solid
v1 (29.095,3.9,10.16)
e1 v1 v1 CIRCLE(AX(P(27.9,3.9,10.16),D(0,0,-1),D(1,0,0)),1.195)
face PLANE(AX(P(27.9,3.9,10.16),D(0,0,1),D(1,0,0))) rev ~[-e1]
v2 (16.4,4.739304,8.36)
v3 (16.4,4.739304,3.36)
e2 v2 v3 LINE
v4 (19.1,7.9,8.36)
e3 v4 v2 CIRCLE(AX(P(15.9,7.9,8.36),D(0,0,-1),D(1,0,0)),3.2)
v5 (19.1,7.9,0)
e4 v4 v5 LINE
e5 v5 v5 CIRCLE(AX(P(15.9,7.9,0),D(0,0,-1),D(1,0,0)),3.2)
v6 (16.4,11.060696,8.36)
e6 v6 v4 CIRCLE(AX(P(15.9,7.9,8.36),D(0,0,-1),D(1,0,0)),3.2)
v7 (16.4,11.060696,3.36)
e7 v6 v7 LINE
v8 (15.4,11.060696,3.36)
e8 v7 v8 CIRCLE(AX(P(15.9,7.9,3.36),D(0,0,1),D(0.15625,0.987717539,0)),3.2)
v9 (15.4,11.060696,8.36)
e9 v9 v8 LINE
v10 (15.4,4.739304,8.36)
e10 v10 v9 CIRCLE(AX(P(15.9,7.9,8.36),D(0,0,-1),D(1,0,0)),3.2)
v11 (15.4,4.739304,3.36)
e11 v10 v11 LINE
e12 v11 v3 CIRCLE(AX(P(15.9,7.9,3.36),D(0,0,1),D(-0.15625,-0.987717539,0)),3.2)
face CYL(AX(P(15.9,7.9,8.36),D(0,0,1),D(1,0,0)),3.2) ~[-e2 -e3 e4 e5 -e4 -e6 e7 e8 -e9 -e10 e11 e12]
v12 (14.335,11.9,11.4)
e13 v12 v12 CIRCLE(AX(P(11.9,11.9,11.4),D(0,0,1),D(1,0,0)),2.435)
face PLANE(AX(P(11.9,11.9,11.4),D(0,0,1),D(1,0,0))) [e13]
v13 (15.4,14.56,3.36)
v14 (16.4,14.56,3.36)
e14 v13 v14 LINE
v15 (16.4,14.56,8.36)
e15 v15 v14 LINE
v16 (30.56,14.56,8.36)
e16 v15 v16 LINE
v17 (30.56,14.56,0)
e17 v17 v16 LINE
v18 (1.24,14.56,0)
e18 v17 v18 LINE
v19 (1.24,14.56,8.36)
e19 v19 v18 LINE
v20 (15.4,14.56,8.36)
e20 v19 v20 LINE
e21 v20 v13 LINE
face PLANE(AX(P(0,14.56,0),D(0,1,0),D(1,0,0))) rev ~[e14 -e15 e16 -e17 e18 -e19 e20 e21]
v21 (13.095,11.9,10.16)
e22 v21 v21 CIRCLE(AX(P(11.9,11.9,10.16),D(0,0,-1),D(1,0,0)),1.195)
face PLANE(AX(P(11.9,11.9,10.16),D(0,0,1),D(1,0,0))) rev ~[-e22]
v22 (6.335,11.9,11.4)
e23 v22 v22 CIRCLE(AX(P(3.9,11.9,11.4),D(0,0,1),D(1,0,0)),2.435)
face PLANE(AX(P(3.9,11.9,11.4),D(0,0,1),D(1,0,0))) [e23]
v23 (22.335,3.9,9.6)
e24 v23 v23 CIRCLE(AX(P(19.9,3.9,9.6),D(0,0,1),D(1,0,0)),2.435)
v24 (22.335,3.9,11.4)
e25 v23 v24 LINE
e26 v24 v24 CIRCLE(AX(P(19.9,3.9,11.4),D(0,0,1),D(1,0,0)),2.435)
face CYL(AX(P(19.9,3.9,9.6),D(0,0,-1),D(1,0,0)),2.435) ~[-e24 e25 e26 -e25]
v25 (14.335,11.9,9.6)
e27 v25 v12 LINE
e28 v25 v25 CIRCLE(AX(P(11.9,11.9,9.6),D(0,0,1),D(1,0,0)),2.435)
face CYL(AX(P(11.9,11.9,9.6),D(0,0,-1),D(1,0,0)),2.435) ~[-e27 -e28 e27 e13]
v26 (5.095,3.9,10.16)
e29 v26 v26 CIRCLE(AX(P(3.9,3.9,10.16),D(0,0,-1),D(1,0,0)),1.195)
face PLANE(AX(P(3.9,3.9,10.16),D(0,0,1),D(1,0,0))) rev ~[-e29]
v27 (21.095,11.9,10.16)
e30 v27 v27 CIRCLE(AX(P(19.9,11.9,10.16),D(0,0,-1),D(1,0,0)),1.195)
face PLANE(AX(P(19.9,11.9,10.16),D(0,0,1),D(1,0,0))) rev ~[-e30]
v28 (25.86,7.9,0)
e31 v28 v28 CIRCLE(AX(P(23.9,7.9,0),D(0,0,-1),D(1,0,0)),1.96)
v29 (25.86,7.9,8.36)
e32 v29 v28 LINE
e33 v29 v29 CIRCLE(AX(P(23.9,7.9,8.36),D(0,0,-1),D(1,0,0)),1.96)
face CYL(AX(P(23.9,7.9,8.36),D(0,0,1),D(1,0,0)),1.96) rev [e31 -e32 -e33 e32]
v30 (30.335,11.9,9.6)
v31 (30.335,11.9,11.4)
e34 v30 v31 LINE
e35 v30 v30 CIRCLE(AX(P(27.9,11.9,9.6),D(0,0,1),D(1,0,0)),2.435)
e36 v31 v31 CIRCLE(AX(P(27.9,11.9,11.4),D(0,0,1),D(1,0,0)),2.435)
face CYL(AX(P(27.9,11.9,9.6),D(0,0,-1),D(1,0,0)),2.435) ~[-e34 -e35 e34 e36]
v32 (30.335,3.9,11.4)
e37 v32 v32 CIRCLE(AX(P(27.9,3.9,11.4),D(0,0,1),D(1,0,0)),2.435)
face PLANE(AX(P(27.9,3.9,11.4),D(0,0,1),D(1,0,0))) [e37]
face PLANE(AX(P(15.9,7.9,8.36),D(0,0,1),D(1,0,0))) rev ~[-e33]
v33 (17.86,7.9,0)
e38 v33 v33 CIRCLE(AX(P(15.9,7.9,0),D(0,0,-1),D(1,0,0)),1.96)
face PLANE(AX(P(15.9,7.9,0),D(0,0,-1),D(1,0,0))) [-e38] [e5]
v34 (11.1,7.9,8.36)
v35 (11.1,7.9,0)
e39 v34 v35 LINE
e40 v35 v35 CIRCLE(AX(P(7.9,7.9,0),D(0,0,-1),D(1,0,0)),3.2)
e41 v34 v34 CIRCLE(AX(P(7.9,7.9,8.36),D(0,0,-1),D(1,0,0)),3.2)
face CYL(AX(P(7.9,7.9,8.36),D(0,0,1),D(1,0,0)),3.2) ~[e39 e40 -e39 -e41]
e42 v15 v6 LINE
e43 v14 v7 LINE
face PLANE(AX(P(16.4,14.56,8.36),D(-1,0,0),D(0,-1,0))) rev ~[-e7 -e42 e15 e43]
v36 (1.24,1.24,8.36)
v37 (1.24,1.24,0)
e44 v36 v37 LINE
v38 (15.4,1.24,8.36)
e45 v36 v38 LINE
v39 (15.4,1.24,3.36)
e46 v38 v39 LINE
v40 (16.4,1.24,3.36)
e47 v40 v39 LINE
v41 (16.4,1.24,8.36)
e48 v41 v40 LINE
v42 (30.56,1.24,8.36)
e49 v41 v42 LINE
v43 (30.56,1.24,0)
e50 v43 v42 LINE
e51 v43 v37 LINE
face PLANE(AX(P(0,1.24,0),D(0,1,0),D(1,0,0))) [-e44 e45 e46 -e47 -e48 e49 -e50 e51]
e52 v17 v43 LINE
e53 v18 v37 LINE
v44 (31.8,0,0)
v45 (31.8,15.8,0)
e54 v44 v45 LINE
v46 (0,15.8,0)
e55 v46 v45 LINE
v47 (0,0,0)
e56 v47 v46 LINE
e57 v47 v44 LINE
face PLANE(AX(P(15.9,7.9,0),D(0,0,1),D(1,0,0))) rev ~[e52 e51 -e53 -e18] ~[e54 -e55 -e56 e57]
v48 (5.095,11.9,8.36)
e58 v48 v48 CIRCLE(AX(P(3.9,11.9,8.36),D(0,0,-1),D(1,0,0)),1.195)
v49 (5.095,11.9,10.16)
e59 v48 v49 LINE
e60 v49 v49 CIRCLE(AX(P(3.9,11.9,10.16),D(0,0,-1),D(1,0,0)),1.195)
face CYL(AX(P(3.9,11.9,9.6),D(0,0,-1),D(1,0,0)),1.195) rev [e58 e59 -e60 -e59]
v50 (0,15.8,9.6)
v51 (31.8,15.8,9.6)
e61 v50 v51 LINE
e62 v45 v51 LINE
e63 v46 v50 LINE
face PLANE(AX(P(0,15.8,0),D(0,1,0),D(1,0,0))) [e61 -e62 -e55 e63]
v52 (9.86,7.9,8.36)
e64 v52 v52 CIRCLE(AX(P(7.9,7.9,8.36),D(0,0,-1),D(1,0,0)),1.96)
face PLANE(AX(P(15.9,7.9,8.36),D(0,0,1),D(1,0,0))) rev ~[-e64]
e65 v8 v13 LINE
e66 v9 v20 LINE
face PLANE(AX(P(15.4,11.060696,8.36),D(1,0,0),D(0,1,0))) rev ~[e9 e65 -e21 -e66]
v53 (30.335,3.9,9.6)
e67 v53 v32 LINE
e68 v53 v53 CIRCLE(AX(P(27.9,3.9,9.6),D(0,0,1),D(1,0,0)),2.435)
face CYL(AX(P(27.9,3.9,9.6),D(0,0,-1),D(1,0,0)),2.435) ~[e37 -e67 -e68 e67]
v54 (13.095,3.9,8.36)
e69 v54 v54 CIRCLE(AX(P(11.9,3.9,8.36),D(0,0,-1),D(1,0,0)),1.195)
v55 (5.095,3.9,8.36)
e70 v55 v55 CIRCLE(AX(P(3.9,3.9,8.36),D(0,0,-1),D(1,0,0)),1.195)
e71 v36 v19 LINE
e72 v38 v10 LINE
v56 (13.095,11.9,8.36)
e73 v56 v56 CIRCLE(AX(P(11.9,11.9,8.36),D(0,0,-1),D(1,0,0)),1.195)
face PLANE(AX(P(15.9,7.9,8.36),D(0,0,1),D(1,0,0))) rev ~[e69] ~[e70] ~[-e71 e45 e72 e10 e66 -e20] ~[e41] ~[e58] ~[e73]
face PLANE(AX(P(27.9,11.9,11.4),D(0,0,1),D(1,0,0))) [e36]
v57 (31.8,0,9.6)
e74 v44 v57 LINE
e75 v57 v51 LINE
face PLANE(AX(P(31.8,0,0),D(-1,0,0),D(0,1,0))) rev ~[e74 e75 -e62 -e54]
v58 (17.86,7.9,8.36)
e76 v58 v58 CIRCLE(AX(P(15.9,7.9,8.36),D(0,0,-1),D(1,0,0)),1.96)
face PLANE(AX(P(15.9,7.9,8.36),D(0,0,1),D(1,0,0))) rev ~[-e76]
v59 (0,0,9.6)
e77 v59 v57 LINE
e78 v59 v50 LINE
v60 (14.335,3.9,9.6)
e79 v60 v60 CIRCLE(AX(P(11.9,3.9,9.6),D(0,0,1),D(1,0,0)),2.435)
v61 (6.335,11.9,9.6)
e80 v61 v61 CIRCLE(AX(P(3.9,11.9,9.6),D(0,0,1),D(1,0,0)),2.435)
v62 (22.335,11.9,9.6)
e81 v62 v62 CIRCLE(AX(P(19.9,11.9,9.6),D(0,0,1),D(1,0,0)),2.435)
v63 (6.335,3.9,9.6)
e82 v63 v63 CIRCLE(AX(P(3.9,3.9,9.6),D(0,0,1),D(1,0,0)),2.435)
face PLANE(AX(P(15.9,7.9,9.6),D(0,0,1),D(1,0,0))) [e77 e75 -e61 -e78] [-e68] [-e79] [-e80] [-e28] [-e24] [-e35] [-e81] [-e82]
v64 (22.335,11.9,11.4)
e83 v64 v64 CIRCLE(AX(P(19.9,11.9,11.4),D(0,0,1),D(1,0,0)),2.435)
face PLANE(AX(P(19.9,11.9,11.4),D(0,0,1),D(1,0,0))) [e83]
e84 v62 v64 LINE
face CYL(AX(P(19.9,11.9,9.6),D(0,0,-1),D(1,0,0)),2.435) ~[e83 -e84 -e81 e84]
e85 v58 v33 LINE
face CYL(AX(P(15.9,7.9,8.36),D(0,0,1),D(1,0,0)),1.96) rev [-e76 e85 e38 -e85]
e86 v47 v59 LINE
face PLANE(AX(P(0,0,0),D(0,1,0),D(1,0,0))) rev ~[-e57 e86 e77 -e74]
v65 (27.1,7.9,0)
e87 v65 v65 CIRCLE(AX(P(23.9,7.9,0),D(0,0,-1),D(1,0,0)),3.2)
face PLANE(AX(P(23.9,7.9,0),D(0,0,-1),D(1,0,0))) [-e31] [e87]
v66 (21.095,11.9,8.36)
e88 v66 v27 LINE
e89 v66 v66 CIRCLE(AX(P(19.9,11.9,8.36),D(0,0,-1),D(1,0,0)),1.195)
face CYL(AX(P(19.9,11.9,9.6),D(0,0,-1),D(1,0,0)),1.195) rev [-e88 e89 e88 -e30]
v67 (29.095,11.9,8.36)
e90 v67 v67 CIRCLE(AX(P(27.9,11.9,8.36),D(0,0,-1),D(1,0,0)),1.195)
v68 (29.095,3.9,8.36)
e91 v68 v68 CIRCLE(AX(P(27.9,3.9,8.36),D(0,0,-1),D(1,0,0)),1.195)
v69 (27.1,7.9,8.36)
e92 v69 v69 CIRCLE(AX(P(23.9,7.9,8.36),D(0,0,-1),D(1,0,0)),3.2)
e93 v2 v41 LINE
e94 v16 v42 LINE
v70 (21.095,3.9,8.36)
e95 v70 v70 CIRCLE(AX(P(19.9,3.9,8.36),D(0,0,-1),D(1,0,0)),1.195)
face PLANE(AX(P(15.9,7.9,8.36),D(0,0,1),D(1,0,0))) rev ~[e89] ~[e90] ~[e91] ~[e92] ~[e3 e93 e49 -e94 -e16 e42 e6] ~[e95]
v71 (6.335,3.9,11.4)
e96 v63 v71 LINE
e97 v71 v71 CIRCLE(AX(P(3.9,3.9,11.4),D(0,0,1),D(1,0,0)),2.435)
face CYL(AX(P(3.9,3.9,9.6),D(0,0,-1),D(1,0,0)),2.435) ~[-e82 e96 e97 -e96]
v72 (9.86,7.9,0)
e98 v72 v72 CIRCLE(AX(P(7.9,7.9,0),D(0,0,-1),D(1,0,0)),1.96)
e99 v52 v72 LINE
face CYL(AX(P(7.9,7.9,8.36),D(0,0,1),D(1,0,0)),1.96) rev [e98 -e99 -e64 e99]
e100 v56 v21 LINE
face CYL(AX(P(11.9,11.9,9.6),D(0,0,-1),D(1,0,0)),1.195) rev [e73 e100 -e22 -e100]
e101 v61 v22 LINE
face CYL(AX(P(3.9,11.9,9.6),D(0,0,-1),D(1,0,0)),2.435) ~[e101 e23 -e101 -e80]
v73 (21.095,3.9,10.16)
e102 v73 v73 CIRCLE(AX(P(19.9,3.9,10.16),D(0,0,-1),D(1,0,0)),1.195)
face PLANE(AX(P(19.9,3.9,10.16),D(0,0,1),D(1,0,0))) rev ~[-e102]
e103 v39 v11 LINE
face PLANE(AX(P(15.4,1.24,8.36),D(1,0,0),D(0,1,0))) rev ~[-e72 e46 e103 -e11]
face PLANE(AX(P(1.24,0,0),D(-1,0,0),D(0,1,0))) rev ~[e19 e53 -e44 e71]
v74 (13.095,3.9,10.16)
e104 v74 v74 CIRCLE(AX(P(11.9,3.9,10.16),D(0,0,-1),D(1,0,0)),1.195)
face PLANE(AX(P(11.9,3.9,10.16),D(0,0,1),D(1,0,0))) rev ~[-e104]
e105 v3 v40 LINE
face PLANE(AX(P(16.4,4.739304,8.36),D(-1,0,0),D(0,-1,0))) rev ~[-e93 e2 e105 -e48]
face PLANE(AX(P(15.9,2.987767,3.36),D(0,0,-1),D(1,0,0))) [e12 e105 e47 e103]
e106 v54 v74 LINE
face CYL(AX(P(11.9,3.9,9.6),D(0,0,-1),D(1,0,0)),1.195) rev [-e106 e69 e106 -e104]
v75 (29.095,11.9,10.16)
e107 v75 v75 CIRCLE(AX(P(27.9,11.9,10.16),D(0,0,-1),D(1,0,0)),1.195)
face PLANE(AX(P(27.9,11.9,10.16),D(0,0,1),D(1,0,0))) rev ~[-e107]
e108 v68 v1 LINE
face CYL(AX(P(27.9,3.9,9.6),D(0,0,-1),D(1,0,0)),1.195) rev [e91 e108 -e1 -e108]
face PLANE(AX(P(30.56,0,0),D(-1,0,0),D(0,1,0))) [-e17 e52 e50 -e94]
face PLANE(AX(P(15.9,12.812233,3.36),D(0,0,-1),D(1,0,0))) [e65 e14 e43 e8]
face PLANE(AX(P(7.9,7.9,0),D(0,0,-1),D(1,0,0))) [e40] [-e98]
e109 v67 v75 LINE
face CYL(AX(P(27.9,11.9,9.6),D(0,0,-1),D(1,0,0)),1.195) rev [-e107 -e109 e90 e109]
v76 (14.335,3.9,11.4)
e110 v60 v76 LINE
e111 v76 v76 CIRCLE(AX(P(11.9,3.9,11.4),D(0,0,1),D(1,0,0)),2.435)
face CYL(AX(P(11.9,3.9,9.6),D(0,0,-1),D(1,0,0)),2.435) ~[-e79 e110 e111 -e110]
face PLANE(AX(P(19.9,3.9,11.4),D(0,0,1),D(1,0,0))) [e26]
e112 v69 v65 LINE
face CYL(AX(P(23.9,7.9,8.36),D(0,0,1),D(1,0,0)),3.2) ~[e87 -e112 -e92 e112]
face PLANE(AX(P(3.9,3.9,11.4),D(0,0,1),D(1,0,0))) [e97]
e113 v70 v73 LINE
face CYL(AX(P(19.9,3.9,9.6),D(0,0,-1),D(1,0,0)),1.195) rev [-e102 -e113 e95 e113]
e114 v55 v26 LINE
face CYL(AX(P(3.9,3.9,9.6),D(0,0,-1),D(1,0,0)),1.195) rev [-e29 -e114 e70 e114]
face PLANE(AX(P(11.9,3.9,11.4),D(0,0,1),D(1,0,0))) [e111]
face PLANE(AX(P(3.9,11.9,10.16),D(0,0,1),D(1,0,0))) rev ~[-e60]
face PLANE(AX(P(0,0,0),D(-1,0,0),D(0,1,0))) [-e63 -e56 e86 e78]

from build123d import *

# Parameters (mm, degrees)
F0_W        = 31.8
F0_H        = 15.8
F1_DEPTH    = 9.6
F2_R        = 2.435
F3_DEPTH    = 1.8
F4_T        = -1.24
F5_R        = 3.2
F6_DEPTH    = 8.36
F7_T        = 1.24
F7_T3_DEPTH = 10.84
F7_T5_DEPTH = 15.8
F7_T7_DEPTH = 31.8
F9_DEPTH    = 5


# Not quite as in the source:
# - a shell that OpenCascade refuses in one call is made with other operations: the cavity is built on its own and cut out


with BuildPart() as f1:
    # F0 (on Top) → F1 (new body)
    with BuildSketch(Plane.XY):
        with Locations((15.9, 7.9)):
            Rectangle(F0_W, F0_H)
    extrude(amount=F1_DEPTH)

    # F2 (on face) → F3 (join)
    with BuildSketch(Plane.XY.offset(9.6)):
        with Locations((11.9, 11.9)):
            Circle(F2_R)
        with Locations((19.9, 11.9)):
            Circle(F2_R)
        with Locations((27.9, 11.9)):
            Circle(F2_R)
        with Locations((27.9, 3.9)):
            Circle(F2_R)
        with Locations((19.9, 3.9)):
            Circle(F2_R)
        with Locations((11.9, 3.9)):
            Circle(F2_R)
        with Locations((3.9, 3.9)):
            Circle(F2_R)
        with Locations((3.9, 11.9)):
            Circle(F2_R)
    extrude(amount=F3_DEPTH)

    # F4
    f4_openings = [f1.faces().sort_by_distance(p)[0] for p in [
        (15.9, 7.9, 0),
    ]]
    offset(amount=F4_T, openings=f4_openings, kind=Kind.INTERSECTION)

    # F5 (on face) → F6 (join, through all)
    with BuildSketch(Plane(origin=(0, 0, 8.36), x_dir=(1, 0, 0), z_dir=(0, 0, -1))):
        with Locations((7.9, -7.9)):
            Circle(F5_R)
        with Locations((15.9, -7.9)):
            Circle(F5_R)
        with Locations((23.9, -7.9)):
            Circle(F5_R)
    extrude(amount=F6_DEPTH)

    # F7: shell of thickness 1.24, made by hand


with BuildPart() as f7_core1:
    # F7_t2: copy of F1
    add(f1.part)

    # the walls: a layer under each face that stays
    f7_faces = [f7_core1.faces().sort_by_distance(p)[0] for p in [
        (0, 7.9, 4.8),
        (15.9, 15.8, 4.8),
        (15.9, 0, 4.8),
        (2.2714285714, 1.1285714286, 0),
        (15.9, 7.9, 9.6),
        (31.8, 7.9, 4.8),
        (1.24, 7.9, 4.18),
        (15.9, 14.56, 4.18),
        (30.56, 7.9, 4.18),
        (15.9, 1.24, 4.18),
        (1.465, 3.9, 10.5),
        (9.465, 3.9, 10.5),
        (17.465, 3.9, 10.5),
        (25.465, 3.9, 10.5),
        (1.465, 11.9, 10.5),
        (9.465, 11.9, 10.5),
        (17.465, 11.9, 10.5),
        (25.465, 11.9, 10.5),
        (6.1266666667, 3.46, 8.36),
        (3.9, 3.9, 11.4),
        (11.9, 3.9, 11.4),
        (19.9, 3.9, 11.4),
        (27.9, 3.9, 11.4),
        (3.9, 11.9, 11.4),
        (11.9, 11.9, 11.4),
        (19.9, 11.9, 11.4),
        (27.9, 11.9, 11.4),
        (2.705, 3.9, 9.26),
        (10.705, 3.9, 9.26),
        (18.705, 3.9, 9.26),
        (26.705, 3.9, 9.26),
        (4.7, 7.9, 4.18),
        (2.705, 11.9, 9.26),
        (10.705, 11.9, 9.26),
        (12.7, 7.9, 4.18),
        (20.7, 7.9, 4.18),
        (18.705, 11.9, 9.26),
        (26.705, 11.9, 9.26),
        (3.9, 3.9, 10.16),
        (11.9, 3.9, 10.16),
        (19.9, 3.9, 10.16),
        (27.9, 3.9, 10.16),
        (3.9, 11.9, 10.16),
        (11.9, 11.9, 10.16),
        (19.9, 11.9, 10.16),
        (27.9, 11.9, 10.16),
    ]]
    thicken(f7_faces, amount=-F7_T, mode=Mode.SUBTRACT)

    # F7_s4 → F7_t3 (cut)
    with BuildSketch(Plane.XY.offset(-1.24)):
        Polygon((1.2524, 14.5476), (0, 14.56), (0, 15.8), (1.24, 15.8), align=None)
        Polygon((1.2524, 1.2524), (0, 1.24), (0, 0), (1.24, 0), align=None)
        Polygon((30.5476, 14.5476), (30.56, 15.8), (31.8, 15.8), (31.8, 14.56), align=None)
        Polygon((30.5476, 1.2524), (31.8, 1.24), (31.8, 0), (30.56, 0), align=None)
    extrude(amount=F7_T3_DEPTH, mode=Mode.SUBTRACT)

    # F7_s6 → F7_t5 (cut)
    with BuildSketch(Plane.XZ.offset(-15.8)):
        Polygon((1.2524, 8.3476), (0, 8.36), (0, 9.6), (1.24, 9.6), align=None)
        Polygon((30.5476, 8.3476), (31.8, 8.36), (31.8, 9.6), (30.56, 9.6), align=None)
    extrude(amount=F7_T5_DEPTH, mode=Mode.SUBTRACT)

    # F7_s8 → F7_t7 (cut)
    with BuildSketch(Plane.YZ):
        Polygon((14.5476, 8.3476), (15.8, 8.36), (15.8, 9.6), (14.56, 9.6), align=None)
        Polygon((1.2524, 8.3476), (0, 8.36), (0, 9.6), (1.24, 9.6), align=None)
    extrude(amount=F7_T7_DEPTH, mode=Mode.SUBTRACT)

    # F7_s9 → F7_t10 (revolve, cut)
    with BuildSketch(Plane.XZ.offset(-3.9)):
        Polygon((6.3474, 9.6124), (6.335, 8.36), (5.095, 8.36), (5.095, 9.6), align=None)
    revolve(axis=Axis((3.9, 3.9, 9.6), (0, 0, 1)), mode=Mode.SUBTRACT)

    # F7_s11 → F7_t12 (revolve, cut)
    with BuildSketch(Plane.XZ.offset(-3.9)):
        Polygon((14.3474, 9.6124), (14.335, 8.36), (13.095, 8.36), (13.095, 9.6), align=None)
    revolve(axis=Axis((11.9, 3.9, 9.6), (0, 0, 1)), mode=Mode.SUBTRACT)

    # F7_s13 → F7_t14 (revolve, cut)
    with BuildSketch(Plane.XZ.offset(-3.9)):
        Polygon((22.3474, 9.6124), (22.335, 8.36), (21.095, 8.36), (21.095, 9.6), align=None)
    revolve(axis=Axis((19.9, 3.9, 9.6), (0, 0, 1)), mode=Mode.SUBTRACT)

    # F7_s15 → F7_t16 (revolve, cut)
    with BuildSketch(Plane.XZ.offset(-3.9)):
        Polygon((30.3474, 9.6124), (30.335, 8.36), (29.095, 8.36), (29.095, 9.6), align=None)
    revolve(axis=Axis((27.9, 3.9, 9.6), (0, 0, 1)), mode=Mode.SUBTRACT)

    # F7_s17 → F7_t18 (revolve, cut)
    with BuildSketch(Plane.XZ.offset(-11.9)):
        Polygon((6.3474, 9.6124), (6.335, 8.36), (5.095, 8.36), (5.095, 9.6), align=None)
    revolve(axis=Axis((3.9, 11.9, 9.6), (0, 0, 1)), mode=Mode.SUBTRACT)

    # F7_s19 → F7_t20 (revolve, cut)
    with BuildSketch(Plane.XZ.offset(-11.9)):
        Polygon((14.3474, 9.6124), (14.335, 8.36), (13.095, 8.36), (13.095, 9.6), align=None)
    revolve(axis=Axis((11.9, 11.9, 9.6), (0, 0, 1)), mode=Mode.SUBTRACT)

    # F7_s21 → F7_t22 (revolve, cut)
    with BuildSketch(Plane.XZ.offset(-11.9)):
        Polygon((22.3474, 9.6124), (22.335, 8.36), (21.095, 8.36), (21.095, 9.6), align=None)
    revolve(axis=Axis((19.9, 11.9, 9.6), (0, 0, 1)), mode=Mode.SUBTRACT)

    # F7_s23 → F7_t24 (revolve, cut)
    with BuildSketch(Plane.XZ.offset(-11.9)):
        Polygon((30.3474, 9.6124), (30.335, 8.36), (29.095, 8.36), (29.095, 9.6), align=None)
    revolve(axis=Axis((27.9, 11.9, 9.6), (0, 0, 1)), mode=Mode.SUBTRACT)

    # F7_s25 → F7_t26 (revolve, cut)
    with BuildSketch(Plane.XZ.offset(-7.9)):
        Polygon((11.1124, 8.3476), (11.1, 9.6), (9.86, 9.6), (9.86, 8.36), align=None)
    revolve(axis=Axis((7.9, 7.9, 8.36), (0, 0, -1)), mode=Mode.SUBTRACT)

    # F7_s27 → F7_t28 (revolve, cut)
    with BuildSketch(Plane.XZ.offset(-7.9)):
        Polygon((19.1124, 8.3476), (19.1, 9.6), (17.86, 9.6), (17.86, 8.36), align=None)
    revolve(axis=Axis((15.9, 7.9, 8.36), (0, 0, -1)), mode=Mode.SUBTRACT)

    # F7_s29 → F7_t30 (revolve, cut)
    with BuildSketch(Plane.XZ.offset(-7.9)):
        Polygon((27.1124, 8.3476), (27.1, 9.6), (25.86, 9.6), (25.86, 8.36), align=None)
    revolve(axis=Axis((23.9, 7.9, 8.36), (0, 0, -1)), mode=Mode.SUBTRACT)

    # F7_s31 → F7_t32 (revolve, cut)
    with BuildSketch(Plane.XZ.offset(-3.9)):
        Polygon((5.0826, 10.1476), (6.335, 10.16), (6.335, 11.4), (5.095, 11.4), align=None)
    revolve(axis=Axis((3.9, 3.9, 10.16), (0, 0, -1)), mode=Mode.SUBTRACT)

    # F7_s33 → F7_t34 (revolve, cut)
    with BuildSketch(Plane.XZ.offset(-3.9)):
        Polygon((13.0826, 10.1476), (14.335, 10.16), (14.335, 11.4), (13.095, 11.4), align=None)
    revolve(axis=Axis((11.9, 3.9, 10.16), (0, 0, -1)), mode=Mode.SUBTRACT)

    # F7_s35 → F7_t36 (revolve, cut)
    with BuildSketch(Plane.XZ.offset(-3.9)):
        Polygon((21.0826, 10.1476), (22.335, 10.16), (22.335, 11.4), (21.095, 11.4), align=None)
    revolve(axis=Axis((19.9, 3.9, 10.16), (0, 0, -1)), mode=Mode.SUBTRACT)

    # F7_s37 → F7_t38 (revolve, cut)
    with BuildSketch(Plane.XZ.offset(-3.9)):
        Polygon((29.0826, 10.1476), (30.335, 10.16), (30.335, 11.4), (29.095, 11.4), align=None)
    revolve(axis=Axis((27.9, 3.9, 10.16), (0, 0, -1)), mode=Mode.SUBTRACT)

    # F7_s39 → F7_t40 (revolve, cut)
    with BuildSketch(Plane.XZ.offset(-11.9)):
        Polygon((5.0826, 10.1476), (6.335, 10.16), (6.335, 11.4), (5.095, 11.4), align=None)
    revolve(axis=Axis((3.9, 11.9, 10.16), (0, 0, -1)), mode=Mode.SUBTRACT)

    # F7_s41 → F7_t42 (revolve, cut)
    with BuildSketch(Plane.XZ.offset(-11.9)):
        Polygon((13.0826, 10.1476), (14.335, 10.16), (14.335, 11.4), (13.095, 11.4), align=None)
    revolve(axis=Axis((11.9, 11.9, 10.16), (0, 0, -1)), mode=Mode.SUBTRACT)

    # F7_s43 → F7_t44 (revolve, cut)
    with BuildSketch(Plane.XZ.offset(-11.9)):
        Polygon((21.0826, 10.1476), (22.335, 10.16), (22.335, 11.4), (21.095, 11.4), align=None)
    revolve(axis=Axis((19.9, 11.9, 10.16), (0, 0, -1)), mode=Mode.SUBTRACT)

    # F7_s45 → F7_t46 (revolve, cut)
    with BuildSketch(Plane.XZ.offset(-11.9)):
        Polygon((29.0826, 10.1476), (30.335, 10.16), (30.335, 11.4), (29.095, 11.4), align=None)
    revolve(axis=Axis((27.9, 11.9, 10.16), (0, 0, -1)), mode=Mode.SUBTRACT)


with BuildPart() as f1_1:
    add(f1.part)

    # what is left inside the walls is the cavity
    f7_cavity = [f7_core1.part.solids().sort_by_distance(p)[0] for p in [
        (5.9524, 7.9, 2.786667),
        (13.9524, 7.9, 2.786667),
        (21.9524, 7.9, 2.786667),
    ]]
    add(f7_cavity, mode=Mode.SUBTRACT)

    # F8 (on face) → F9 (join)
    with BuildSketch(Plane(origin=(0, 0, 8.36), x_dir=(1, 0, 0), z_dir=(0, 0, -1))):
        with BuildLine():
            Line((16.4, -1.24), (15.4, -1.24))
            Line((15.4, -1.24), (15.4, -4.7393038741))
            ThreePointArc((15.4, -4.7393038741), (15.9, -4.7), (16.4, -4.7393038741))
            Line((16.4, -4.7393038741), (16.4, -1.24))
        make_face()
        with BuildLine():
            ThreePointArc((16.4, -11.0606961259), (15.9, -11.1), (15.4, -11.0606961259))
            Line((15.4, -11.0606961259), (15.4, -14.56))
            Line((15.4, -14.56), (16.4, -14.56))
            Line((16.4, -14.56), (16.4, -11.0606961259))
        make_face()
    extrude(amount=F9_DEPTH)


solid = f1_1.part
